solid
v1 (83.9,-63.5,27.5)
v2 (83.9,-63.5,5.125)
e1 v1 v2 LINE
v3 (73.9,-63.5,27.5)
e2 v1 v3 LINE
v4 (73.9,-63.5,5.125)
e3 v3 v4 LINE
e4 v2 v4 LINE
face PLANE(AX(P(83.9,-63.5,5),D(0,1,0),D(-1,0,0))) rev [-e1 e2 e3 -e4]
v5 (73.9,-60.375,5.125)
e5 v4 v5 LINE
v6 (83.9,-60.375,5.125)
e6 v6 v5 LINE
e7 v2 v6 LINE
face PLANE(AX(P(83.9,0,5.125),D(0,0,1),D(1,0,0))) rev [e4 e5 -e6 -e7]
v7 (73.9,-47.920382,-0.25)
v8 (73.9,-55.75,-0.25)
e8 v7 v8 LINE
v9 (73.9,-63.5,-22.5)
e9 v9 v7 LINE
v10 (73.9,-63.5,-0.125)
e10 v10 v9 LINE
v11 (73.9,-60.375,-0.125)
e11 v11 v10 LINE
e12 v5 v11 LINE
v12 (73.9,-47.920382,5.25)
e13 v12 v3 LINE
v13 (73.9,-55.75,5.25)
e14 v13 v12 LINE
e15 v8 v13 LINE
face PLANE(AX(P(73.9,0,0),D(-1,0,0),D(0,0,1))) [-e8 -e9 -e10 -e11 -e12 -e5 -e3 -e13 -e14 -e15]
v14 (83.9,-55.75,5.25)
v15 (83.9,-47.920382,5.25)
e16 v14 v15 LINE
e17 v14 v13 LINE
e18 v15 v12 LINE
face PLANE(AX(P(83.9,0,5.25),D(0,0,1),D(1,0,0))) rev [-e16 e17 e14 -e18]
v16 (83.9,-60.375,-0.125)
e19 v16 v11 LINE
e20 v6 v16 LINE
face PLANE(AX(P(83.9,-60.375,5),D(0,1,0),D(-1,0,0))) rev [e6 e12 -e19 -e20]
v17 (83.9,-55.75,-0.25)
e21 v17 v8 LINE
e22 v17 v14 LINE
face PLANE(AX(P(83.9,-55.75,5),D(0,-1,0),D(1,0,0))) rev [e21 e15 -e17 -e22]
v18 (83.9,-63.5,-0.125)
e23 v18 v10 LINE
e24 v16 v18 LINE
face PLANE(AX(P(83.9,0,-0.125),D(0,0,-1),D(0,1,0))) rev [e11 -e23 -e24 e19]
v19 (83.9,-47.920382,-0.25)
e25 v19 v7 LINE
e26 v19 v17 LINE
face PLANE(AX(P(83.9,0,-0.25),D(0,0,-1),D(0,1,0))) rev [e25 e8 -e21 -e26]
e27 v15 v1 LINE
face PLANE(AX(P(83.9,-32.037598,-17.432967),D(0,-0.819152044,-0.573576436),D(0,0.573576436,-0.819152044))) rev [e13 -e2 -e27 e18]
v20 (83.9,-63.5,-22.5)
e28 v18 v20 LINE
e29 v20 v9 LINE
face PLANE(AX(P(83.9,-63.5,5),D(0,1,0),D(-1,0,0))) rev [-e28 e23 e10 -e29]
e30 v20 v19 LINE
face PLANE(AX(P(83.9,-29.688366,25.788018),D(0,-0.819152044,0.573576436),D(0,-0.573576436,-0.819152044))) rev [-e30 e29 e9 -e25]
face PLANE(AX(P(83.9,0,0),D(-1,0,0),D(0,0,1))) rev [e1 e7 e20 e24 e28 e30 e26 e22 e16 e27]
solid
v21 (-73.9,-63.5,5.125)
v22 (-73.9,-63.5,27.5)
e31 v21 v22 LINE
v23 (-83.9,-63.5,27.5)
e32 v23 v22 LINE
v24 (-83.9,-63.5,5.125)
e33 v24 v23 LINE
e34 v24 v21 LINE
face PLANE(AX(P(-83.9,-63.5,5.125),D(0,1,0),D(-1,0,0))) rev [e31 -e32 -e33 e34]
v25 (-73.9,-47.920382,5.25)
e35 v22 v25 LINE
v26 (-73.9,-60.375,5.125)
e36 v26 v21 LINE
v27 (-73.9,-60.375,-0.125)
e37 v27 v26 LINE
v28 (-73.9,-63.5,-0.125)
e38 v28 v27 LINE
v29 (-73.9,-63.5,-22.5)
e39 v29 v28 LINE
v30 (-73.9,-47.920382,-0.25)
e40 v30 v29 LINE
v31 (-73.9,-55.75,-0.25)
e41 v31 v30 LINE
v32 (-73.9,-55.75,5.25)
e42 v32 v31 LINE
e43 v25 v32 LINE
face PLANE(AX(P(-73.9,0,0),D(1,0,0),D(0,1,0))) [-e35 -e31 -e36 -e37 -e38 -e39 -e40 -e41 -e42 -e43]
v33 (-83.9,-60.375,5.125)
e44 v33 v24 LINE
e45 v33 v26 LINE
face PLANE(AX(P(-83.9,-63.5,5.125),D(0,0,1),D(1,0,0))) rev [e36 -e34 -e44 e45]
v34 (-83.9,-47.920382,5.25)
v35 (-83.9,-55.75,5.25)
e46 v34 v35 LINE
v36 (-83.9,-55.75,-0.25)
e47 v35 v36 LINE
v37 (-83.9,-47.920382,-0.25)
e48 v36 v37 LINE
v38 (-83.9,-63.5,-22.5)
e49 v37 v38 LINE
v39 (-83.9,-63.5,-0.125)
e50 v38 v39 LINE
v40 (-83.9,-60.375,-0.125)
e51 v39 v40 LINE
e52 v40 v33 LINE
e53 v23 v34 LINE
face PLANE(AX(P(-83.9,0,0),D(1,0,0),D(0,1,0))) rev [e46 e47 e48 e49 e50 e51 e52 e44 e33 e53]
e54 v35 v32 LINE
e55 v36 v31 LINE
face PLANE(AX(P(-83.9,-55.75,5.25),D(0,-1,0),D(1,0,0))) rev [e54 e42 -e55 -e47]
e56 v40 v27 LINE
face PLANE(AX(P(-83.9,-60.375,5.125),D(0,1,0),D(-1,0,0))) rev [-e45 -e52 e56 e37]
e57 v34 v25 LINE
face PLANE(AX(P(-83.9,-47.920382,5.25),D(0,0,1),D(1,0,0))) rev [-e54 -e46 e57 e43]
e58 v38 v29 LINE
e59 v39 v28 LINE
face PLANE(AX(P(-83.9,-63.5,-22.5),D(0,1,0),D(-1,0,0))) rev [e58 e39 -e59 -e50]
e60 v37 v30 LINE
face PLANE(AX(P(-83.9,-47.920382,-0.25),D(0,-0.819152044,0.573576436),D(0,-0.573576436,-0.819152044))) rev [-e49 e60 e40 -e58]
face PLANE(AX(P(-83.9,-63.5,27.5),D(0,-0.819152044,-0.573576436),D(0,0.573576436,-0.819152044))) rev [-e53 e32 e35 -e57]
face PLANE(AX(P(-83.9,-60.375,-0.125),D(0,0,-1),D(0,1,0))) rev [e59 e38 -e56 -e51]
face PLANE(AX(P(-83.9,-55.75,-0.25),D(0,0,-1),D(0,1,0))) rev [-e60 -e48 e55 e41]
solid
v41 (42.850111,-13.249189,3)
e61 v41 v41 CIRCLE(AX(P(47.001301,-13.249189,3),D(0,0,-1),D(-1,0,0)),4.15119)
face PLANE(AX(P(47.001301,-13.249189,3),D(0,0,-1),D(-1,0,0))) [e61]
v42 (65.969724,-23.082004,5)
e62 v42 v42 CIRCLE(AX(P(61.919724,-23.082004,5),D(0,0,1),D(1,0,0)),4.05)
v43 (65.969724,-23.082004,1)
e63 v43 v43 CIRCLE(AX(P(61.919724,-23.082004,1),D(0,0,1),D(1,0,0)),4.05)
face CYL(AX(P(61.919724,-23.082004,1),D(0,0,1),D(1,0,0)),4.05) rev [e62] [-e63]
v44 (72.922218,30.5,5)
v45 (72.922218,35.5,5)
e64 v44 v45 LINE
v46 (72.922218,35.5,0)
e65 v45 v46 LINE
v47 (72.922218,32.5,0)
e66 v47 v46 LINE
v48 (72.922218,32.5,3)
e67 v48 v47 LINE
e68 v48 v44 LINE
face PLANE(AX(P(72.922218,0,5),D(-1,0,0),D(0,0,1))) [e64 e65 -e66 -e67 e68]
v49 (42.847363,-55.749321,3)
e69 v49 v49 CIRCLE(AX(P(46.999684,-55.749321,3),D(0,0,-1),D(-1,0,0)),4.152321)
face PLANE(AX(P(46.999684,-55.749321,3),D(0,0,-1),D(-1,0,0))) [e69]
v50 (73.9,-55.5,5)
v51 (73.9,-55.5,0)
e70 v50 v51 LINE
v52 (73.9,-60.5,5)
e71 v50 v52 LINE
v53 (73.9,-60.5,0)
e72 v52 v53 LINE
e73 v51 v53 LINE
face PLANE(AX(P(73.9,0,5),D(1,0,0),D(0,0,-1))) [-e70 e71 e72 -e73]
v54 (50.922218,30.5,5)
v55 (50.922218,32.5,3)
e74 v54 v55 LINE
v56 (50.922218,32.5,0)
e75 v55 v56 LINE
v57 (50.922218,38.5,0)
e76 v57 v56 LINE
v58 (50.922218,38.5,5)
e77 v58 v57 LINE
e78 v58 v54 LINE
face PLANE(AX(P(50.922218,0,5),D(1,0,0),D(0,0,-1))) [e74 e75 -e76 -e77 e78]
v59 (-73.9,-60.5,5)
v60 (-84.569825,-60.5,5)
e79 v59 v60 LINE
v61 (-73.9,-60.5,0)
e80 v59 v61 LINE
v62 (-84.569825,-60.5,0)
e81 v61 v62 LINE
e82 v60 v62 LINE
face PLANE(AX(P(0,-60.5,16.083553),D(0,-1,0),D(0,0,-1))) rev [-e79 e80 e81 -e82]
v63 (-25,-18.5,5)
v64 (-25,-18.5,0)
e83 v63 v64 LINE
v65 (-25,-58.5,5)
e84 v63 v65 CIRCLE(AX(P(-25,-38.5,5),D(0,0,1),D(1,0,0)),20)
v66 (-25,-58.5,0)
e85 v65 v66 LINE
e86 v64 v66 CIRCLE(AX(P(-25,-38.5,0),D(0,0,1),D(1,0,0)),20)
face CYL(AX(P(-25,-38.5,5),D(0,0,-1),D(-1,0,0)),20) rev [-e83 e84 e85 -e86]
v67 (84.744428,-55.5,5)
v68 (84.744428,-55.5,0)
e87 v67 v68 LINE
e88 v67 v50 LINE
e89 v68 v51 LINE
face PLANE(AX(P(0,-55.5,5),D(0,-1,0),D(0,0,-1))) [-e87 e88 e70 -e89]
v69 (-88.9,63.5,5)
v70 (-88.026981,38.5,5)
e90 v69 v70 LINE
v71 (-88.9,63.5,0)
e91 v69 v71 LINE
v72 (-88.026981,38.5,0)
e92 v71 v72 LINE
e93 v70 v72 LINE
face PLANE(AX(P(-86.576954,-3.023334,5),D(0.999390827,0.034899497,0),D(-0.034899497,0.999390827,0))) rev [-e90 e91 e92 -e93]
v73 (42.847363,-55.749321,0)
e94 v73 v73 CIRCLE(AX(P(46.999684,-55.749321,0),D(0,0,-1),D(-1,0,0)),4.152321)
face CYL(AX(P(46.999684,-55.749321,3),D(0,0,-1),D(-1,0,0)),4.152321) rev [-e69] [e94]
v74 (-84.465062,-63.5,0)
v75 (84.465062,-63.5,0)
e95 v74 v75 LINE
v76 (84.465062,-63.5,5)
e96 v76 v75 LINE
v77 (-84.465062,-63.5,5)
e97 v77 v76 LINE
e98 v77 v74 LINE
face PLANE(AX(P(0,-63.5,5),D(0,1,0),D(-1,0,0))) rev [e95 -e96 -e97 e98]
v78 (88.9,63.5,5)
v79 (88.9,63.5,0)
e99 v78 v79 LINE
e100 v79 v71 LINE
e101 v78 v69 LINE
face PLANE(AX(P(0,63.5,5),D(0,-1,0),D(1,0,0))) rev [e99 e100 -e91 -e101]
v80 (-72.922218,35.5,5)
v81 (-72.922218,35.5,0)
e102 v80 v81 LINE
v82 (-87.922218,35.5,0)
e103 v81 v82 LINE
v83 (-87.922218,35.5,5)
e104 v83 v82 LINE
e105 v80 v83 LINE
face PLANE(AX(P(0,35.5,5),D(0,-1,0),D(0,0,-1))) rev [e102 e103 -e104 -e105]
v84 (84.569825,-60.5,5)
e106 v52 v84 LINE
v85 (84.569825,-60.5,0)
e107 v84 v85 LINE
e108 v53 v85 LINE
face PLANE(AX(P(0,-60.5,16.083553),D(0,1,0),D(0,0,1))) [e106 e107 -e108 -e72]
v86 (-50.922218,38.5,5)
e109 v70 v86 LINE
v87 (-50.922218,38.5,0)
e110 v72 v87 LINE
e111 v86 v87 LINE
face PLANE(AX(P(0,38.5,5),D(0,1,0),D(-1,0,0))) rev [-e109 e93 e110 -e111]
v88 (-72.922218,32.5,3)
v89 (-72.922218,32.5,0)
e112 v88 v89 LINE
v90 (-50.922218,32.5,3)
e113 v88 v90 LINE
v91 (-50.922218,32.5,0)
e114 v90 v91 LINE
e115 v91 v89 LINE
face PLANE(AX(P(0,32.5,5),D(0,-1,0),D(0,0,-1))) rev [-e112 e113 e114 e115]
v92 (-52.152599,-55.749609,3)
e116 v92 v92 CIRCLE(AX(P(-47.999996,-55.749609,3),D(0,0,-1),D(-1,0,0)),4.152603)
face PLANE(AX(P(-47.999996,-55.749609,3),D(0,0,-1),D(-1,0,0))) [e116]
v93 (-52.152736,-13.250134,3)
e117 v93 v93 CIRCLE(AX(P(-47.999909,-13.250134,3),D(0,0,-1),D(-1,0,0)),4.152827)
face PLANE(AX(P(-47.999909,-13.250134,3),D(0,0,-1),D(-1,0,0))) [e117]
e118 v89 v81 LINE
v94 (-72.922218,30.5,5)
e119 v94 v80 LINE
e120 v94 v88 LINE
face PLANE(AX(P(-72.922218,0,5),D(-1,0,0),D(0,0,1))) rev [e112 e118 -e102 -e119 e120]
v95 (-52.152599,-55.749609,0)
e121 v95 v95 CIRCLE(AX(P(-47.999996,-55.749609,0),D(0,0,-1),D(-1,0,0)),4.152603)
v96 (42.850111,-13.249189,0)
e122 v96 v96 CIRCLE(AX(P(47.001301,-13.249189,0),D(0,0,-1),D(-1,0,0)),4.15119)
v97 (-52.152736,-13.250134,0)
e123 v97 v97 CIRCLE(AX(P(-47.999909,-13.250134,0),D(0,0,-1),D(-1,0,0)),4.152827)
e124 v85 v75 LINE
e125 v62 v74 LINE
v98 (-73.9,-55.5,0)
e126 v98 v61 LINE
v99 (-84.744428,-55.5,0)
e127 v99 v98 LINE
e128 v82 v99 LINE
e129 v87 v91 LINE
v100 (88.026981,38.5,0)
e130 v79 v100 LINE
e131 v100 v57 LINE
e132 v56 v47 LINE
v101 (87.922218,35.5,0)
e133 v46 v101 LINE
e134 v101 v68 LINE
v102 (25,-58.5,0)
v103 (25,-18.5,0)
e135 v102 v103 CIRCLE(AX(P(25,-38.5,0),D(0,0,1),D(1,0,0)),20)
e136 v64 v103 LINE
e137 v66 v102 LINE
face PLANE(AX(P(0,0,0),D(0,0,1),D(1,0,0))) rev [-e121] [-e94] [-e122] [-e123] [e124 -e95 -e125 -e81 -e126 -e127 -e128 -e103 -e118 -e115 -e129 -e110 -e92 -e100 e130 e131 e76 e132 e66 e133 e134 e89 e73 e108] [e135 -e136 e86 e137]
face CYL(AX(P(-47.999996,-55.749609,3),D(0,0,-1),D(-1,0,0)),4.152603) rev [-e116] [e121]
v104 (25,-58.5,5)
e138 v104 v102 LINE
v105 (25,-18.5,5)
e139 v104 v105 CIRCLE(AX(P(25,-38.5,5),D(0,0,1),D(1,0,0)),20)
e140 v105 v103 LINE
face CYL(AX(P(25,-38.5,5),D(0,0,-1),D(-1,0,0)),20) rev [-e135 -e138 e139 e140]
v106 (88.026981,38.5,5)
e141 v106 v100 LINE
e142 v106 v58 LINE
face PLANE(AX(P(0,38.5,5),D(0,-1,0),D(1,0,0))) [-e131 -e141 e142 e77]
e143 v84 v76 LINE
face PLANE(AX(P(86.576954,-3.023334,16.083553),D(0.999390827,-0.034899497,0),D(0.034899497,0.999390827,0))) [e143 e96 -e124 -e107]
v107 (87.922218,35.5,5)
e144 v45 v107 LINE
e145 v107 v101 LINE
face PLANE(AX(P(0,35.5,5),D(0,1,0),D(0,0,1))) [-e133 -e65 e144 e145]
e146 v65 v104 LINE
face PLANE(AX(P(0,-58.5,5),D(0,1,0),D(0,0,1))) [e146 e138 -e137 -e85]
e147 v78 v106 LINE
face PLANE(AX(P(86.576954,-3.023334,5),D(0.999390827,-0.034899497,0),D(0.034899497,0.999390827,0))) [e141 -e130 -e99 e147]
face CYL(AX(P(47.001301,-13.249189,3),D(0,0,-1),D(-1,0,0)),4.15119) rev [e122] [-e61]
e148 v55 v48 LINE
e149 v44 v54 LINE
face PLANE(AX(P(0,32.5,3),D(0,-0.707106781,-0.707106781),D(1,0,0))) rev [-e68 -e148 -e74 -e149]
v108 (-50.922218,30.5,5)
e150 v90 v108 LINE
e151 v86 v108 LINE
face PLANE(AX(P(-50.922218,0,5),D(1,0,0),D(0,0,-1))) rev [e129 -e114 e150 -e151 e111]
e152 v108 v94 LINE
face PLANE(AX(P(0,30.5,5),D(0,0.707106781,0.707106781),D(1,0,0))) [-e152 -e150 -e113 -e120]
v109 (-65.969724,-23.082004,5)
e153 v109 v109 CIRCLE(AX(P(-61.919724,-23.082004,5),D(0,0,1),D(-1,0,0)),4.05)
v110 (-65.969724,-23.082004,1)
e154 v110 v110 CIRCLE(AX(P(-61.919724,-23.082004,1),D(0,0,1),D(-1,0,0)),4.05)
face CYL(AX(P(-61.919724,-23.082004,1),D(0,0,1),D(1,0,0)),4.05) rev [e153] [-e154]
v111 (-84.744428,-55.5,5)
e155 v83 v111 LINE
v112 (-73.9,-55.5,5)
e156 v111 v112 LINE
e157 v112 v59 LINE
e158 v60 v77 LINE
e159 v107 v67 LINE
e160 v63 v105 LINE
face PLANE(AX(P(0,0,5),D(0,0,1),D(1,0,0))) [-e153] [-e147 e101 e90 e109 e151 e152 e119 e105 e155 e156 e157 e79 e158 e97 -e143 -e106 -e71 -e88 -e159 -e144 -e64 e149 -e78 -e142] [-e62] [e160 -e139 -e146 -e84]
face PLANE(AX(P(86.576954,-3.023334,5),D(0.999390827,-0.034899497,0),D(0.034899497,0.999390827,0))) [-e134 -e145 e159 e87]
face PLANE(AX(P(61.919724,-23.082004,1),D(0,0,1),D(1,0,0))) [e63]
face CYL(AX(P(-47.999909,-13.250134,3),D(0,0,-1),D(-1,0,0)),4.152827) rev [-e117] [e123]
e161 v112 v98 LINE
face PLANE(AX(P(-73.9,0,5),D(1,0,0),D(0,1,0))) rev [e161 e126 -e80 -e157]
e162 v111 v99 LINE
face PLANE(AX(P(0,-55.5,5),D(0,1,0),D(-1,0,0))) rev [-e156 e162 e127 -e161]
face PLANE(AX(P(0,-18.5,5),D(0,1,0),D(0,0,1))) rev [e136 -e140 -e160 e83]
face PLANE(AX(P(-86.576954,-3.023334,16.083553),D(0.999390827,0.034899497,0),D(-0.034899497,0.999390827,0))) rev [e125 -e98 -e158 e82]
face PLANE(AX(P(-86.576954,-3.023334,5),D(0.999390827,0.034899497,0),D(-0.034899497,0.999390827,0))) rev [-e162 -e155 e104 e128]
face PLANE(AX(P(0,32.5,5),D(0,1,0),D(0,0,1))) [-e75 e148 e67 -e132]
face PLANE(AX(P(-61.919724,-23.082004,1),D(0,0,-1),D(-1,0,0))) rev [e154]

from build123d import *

# Parameters (mm, degrees)
BOSS_EXTRUDE1_DEPTH = 5
CHAMFER1_SIZE       = 2
BOSS_EXTRUDE4_DEPTH = 5
SKETCH2_R           = 4.05
CUT_EXTRUDE2_DEPTH  = 4
BOSS_EXTRUDE2_DEPTH = 10
BOSS_EXTRUDE3_START = -147.8
BOSS_EXTRUDE3_DEPTH = 10
SKETCH4_R           = 4.152826732
SKETCH4_R_2         = 4.151190034
SKETCH4_R_3         = 4.152320734
SKETCH4_R_4         = 4.152602902
CUT_EXTRUDE3_DEPTH  = 3


# Read off the part's stored shape, not the designer's step: Boss-Extrude1, Boss-Extrude4
with BuildPart() as part:
    # Boss-Extrude1 outline → Boss-Extrude1 (new body)
    with BuildSketch(Plane.XY):
        Polygon((-88.9, 63.5), (-88.026980763, 38.5), (-50.922218454, 38.5), (-50.922218454, 32.5), (-72.922218454, 32.5), (-72.922218454, 35.5), (-87.922218454, 35.5), (-84.74442843, -55.5), (-73.9, -55.5), (-73.9, -63.5), (73.9, -63.5), (73.9, -55.5), (84.74442843, -55.5), (87.922218454, 35.5), (72.922218454, 35.5), (72.922218454, 32.5), (50.922218454, 32.5), (50.922218454, 38.5), (88.026980763, 38.5), (88.9, 63.5), align=None)
        with BuildLine():
            Line((-25, -18.5), (25, -18.5))
            ThreePointArc((25, -18.5), (45, -38.5), (25, -58.5))
            Line((25, -58.5), (-25, -58.5))
            ThreePointArc((-25, -58.5), (-45, -38.5), (-25, -18.5))
        make_face(mode=Mode.SUBTRACT)
    extrude(amount=BOSS_EXTRUDE1_DEPTH)

    # Chamfer1
    chamfer1_edges = [part.edges().sort_by_distance(p)[0] for p in [
        (61.922218454, 32.5, 5),
        (-61.922218454, 32.5, 5),
    ]]
    chamfer(chamfer1_edges, length=CHAMFER1_SIZE)

    # Boss-Extrude4 outline → Boss-Extrude4 (add)
    with BuildSketch(Plane.XY):
        Polygon((73.9, -60.5), (73.9, -63.5), (84.465062275, -63.5), (84.569824583, -60.5), align=None)
        Polygon((-84.569824583, -60.5), (-84.465062275, -63.5), (-73.9, -63.5), (-73.9, -60.5), align=None)
    extrude(amount=BOSS_EXTRUDE4_DEPTH)

    # Sketch2 → Cut-Extrude2 (cut)
    with BuildSketch(Plane.XY.offset(5)):
        with Locations((61.919723642, -23.082003832)):
            Circle(SKETCH2_R)
        with Locations(Location((-61.919723642, -23.082003832, 0), (0, 0, 180))):
            Circle(SKETCH2_R)
    extrude(amount=-CUT_EXTRUDE2_DEPTH, mode=Mode.SUBTRACT)

    # Sketch4 → Cut-Extrude3 (cut)
    with BuildSketch(Plane(origin=(0, 0, 0), x_dir=(-1, 0, 0), z_dir=(0, 0, -1))):
        with Locations((47.999909157, -13.250133675)):
            Circle(SKETCH4_R)
        with Locations((-47.001300636, -13.249189401)):
            Circle(SKETCH4_R_2)
        with Locations((-46.999683563, -55.749320844)):
            Circle(SKETCH4_R_3)
        with Locations((47.999996185, -55.749608673)):
            Circle(SKETCH4_R_4)
    extrude(amount=-CUT_EXTRUDE3_DEPTH, mode=Mode.SUBTRACT)


with BuildPart() as body_2:
    # Sketch3 → Boss-Extrude2 (new body)
    with BuildSketch(Plane.ZY.offset(73.9)):
        Polygon((-22.5, -63.5), (-0.125, -63.5), (-0.125, -60.375), (5.125, -60.375), (5.125, -63.5), (27.5, -63.5), (5.25, -47.920382275), (5.25, -55.75), (-0.25, -55.75), (-0.25, -47.920382275), align=None)
    extrude(amount=BOSS_EXTRUDE2_DEPTH)


with BuildPart() as body_3:
    # Sketch3<2> → Boss-Extrude3 (new body)
    with BuildSketch(Plane.ZY.offset(73.9).offset(BOSS_EXTRUDE3_START)):
        Polygon((-22.5, -63.5), (-0.125, -63.5), (-0.125, -60.375), (5.125, -60.375), (5.125, -63.5), (27.5, -63.5), (5.25, -47.920382275), (5.25, -55.75), (-0.25, -55.75), (-0.25, -47.920382275), align=None)
    extrude(amount=-BOSS_EXTRUDE3_DEPTH)


solid = Compound([part.part, body_2.part, body_3.part])
